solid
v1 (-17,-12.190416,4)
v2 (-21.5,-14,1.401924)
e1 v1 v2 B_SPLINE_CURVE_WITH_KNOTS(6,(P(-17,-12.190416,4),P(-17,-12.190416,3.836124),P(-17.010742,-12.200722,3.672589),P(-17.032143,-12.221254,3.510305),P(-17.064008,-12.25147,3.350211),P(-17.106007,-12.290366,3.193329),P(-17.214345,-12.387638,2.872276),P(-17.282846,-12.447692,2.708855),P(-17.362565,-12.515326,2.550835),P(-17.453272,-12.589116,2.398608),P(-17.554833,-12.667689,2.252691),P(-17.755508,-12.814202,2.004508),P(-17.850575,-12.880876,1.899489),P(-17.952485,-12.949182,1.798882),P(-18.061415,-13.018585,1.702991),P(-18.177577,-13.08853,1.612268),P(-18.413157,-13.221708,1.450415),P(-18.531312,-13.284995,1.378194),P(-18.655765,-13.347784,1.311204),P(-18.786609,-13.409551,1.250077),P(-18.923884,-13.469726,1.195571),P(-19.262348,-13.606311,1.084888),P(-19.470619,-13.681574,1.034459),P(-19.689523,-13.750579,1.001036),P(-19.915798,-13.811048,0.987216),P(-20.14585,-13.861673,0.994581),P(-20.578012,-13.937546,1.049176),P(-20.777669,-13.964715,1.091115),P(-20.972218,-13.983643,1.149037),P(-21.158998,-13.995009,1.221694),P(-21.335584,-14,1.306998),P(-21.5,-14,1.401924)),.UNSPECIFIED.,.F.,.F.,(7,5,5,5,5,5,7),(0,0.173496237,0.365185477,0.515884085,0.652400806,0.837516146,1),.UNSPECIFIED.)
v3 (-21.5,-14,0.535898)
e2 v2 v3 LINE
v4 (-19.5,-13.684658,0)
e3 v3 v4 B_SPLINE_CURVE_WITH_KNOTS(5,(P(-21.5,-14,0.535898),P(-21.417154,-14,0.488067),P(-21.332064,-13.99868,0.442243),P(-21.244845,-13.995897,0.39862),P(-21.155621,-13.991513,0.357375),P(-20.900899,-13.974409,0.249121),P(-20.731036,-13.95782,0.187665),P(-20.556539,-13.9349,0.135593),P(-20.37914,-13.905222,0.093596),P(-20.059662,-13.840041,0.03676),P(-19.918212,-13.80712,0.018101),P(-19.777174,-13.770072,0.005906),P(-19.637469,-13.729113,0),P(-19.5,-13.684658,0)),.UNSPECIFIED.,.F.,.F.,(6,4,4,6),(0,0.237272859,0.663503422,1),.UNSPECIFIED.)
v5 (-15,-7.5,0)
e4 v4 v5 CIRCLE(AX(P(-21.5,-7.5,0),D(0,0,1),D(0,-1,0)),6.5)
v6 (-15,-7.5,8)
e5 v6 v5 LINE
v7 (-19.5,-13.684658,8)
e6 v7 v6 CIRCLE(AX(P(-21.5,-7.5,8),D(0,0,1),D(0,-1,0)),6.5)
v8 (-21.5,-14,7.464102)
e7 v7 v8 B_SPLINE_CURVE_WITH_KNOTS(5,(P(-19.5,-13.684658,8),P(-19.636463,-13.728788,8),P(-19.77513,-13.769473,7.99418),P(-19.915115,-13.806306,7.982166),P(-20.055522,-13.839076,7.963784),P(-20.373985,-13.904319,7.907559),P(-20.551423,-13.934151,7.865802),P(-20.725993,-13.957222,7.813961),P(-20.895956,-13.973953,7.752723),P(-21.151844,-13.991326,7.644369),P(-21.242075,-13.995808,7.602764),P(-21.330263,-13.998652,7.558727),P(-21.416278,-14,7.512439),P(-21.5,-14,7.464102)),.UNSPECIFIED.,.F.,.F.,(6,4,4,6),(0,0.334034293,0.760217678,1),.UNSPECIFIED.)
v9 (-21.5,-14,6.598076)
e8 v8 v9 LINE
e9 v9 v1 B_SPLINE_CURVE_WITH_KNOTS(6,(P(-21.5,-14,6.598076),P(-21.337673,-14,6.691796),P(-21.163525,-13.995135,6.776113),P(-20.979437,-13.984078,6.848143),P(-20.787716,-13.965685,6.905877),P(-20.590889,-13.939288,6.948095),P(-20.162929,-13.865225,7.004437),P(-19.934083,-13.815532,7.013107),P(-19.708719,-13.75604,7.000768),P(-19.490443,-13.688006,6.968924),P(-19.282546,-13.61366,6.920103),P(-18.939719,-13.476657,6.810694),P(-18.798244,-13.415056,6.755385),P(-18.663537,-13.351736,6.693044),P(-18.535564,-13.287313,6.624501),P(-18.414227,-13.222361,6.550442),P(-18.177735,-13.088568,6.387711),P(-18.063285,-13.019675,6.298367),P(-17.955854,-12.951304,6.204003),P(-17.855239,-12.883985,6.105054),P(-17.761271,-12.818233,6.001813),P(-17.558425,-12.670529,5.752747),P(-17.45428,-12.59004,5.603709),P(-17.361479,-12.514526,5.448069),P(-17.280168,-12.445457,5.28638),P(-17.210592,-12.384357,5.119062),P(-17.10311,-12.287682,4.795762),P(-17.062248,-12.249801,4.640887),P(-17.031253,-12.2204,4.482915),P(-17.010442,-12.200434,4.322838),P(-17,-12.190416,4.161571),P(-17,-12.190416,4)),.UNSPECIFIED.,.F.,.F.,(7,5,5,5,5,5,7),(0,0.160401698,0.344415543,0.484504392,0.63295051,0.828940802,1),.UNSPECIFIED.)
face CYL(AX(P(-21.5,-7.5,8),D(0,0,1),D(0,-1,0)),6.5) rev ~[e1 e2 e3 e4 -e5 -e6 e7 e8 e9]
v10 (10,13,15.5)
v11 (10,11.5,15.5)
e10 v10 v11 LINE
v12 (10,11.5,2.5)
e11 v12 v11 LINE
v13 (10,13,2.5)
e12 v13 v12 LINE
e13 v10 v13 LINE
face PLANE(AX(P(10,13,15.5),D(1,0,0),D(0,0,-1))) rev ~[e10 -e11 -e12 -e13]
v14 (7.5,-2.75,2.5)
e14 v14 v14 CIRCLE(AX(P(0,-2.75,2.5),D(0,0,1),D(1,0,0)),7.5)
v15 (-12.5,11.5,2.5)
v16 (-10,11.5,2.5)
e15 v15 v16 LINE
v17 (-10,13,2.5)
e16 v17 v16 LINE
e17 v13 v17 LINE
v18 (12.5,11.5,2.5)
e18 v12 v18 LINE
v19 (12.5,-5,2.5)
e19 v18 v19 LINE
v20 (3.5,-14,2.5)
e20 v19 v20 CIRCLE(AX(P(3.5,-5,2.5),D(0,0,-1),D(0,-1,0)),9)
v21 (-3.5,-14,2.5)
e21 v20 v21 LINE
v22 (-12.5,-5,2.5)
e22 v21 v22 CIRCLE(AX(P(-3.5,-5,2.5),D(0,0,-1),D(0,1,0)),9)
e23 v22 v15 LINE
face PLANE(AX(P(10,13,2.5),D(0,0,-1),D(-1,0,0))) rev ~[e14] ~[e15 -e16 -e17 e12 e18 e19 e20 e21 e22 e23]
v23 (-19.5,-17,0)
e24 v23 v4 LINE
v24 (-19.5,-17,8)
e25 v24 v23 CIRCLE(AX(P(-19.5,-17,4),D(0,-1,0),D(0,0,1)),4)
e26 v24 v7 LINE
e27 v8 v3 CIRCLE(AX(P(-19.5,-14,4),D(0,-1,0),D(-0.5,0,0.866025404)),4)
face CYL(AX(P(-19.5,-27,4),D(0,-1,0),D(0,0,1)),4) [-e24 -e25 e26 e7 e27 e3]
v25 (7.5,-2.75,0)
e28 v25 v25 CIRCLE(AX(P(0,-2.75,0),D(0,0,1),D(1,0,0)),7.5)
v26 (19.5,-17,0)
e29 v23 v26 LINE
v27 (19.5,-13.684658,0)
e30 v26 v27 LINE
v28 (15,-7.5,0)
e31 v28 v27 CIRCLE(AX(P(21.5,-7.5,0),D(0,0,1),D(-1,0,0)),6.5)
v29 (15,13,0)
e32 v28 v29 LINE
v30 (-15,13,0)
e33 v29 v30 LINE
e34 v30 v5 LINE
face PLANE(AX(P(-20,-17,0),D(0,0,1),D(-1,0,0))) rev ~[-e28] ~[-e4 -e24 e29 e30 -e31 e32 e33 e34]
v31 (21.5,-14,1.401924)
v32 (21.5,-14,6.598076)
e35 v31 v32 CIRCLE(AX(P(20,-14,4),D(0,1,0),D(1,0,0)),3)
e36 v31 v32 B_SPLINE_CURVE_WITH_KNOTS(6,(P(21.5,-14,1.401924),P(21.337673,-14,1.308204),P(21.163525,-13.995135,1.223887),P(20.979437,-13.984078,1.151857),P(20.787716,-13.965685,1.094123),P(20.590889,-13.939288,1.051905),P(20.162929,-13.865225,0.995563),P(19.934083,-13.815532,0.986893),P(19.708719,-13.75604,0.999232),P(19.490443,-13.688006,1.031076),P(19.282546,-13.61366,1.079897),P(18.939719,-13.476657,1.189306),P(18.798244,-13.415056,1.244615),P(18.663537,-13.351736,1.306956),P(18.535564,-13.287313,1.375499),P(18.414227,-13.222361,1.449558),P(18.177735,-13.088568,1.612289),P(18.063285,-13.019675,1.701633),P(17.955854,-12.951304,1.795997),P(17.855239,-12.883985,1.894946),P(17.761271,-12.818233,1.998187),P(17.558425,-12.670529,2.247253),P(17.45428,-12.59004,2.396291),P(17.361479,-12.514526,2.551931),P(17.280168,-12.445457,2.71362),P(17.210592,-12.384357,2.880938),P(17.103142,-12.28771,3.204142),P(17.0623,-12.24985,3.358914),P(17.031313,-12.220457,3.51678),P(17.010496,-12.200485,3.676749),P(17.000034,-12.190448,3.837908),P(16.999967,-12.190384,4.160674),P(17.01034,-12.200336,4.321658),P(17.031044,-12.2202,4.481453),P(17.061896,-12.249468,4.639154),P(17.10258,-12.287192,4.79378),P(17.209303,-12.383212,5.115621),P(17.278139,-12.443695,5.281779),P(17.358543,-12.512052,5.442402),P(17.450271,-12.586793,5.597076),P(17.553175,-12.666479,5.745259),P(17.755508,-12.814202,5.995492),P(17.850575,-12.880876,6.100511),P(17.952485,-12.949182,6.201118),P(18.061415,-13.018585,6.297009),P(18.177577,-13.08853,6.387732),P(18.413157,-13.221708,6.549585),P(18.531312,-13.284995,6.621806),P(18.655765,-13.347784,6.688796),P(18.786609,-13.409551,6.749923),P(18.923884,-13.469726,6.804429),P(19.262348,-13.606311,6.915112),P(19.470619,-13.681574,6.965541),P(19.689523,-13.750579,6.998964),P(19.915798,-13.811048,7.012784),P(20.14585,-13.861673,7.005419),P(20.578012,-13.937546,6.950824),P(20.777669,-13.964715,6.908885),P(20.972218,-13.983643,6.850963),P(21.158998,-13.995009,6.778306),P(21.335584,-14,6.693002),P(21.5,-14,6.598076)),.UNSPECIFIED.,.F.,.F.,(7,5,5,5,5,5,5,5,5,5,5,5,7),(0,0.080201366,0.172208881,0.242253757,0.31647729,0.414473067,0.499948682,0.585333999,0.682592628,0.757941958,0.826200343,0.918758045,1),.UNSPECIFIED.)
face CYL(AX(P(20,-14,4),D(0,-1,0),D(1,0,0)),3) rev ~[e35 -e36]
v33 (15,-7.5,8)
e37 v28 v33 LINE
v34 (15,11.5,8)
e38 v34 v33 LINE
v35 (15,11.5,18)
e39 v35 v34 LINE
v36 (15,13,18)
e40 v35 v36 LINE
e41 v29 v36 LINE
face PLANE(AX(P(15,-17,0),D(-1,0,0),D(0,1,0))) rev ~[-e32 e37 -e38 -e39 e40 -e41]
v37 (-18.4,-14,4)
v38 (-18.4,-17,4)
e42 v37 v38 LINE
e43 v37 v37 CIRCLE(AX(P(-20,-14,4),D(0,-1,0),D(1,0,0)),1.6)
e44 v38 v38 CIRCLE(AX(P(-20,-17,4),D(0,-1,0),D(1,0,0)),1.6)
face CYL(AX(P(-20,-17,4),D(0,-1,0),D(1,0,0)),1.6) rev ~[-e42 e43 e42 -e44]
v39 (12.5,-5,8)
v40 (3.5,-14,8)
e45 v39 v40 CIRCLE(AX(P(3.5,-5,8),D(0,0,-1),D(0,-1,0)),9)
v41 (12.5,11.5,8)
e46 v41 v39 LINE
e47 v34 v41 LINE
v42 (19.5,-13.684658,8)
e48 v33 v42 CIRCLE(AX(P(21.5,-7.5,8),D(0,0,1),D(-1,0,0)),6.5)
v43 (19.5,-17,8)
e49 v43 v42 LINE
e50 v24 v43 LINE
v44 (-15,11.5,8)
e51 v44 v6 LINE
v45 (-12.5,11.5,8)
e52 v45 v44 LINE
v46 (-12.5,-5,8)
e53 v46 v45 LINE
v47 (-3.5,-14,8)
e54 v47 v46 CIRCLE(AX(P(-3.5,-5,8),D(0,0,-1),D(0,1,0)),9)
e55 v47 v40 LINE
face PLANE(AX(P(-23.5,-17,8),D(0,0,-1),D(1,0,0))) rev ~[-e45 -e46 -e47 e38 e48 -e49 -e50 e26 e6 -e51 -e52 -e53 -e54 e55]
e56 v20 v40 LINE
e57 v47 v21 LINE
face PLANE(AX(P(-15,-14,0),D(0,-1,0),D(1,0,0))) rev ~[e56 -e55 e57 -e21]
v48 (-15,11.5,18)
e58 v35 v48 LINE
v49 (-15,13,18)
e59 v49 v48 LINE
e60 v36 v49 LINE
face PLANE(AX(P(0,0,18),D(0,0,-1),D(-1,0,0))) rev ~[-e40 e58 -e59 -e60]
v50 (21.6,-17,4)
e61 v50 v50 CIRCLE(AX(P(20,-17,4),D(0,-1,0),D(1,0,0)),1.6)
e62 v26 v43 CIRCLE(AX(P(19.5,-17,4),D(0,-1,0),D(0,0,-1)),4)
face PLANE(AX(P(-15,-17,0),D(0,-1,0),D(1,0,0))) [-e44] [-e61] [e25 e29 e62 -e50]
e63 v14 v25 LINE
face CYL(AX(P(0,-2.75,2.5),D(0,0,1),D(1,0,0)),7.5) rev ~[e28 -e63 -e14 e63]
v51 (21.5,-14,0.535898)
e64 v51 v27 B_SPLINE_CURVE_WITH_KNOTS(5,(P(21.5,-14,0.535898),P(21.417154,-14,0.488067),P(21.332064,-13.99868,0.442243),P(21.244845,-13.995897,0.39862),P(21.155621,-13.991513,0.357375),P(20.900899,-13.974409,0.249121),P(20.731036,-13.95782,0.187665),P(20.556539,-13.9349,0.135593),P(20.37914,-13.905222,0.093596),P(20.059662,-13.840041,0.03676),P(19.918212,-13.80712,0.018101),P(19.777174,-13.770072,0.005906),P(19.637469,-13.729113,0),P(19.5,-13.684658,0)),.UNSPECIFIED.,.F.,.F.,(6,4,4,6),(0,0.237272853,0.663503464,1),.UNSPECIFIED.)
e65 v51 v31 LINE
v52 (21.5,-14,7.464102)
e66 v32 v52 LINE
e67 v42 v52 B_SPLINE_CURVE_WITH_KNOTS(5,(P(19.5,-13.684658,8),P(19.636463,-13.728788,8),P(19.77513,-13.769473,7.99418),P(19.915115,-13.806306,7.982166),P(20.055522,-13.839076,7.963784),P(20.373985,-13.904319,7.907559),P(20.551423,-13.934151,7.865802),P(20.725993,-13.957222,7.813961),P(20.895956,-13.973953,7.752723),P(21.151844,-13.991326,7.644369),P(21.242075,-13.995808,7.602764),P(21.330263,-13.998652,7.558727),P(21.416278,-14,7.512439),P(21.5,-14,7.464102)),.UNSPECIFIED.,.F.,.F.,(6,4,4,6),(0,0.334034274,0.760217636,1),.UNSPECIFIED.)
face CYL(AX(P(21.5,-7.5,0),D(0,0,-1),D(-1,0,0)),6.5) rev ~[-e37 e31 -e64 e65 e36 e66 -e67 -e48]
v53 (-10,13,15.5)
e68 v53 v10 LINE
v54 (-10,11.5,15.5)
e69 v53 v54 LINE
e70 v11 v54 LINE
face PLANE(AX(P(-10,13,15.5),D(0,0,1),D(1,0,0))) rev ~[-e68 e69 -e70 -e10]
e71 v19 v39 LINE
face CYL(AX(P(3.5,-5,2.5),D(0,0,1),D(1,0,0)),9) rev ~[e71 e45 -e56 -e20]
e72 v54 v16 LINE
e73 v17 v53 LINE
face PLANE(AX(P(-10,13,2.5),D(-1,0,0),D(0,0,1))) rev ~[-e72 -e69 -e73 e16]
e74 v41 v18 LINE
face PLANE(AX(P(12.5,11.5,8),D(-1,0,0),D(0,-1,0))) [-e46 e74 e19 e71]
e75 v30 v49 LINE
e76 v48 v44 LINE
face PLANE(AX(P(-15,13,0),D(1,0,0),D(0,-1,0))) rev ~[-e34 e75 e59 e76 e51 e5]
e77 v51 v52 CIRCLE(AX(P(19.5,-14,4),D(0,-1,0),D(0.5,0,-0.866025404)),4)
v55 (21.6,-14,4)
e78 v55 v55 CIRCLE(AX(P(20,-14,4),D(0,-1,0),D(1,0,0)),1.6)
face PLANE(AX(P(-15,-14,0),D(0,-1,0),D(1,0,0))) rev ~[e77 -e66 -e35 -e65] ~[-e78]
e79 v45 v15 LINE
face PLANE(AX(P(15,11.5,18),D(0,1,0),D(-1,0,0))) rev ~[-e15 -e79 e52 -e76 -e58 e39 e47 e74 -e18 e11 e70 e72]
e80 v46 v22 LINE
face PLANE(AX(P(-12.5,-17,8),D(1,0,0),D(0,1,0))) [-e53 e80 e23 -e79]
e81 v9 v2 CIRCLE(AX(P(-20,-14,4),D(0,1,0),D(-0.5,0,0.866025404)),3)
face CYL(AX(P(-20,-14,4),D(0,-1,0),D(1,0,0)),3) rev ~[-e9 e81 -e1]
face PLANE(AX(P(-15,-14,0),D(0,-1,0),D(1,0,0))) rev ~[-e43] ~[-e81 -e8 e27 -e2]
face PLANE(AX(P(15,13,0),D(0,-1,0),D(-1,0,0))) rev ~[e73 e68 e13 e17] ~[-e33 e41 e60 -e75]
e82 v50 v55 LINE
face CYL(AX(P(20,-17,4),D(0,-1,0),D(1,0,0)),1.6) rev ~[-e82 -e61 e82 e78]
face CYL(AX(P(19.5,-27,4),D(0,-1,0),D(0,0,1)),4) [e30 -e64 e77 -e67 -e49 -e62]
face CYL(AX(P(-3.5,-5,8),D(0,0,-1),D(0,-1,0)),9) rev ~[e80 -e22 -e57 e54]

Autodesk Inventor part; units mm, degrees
ref_plane "YZ Plane" through (0, 0, 0) normal (1, 0, 0) x (0, 1, 0)
ref_plane "XZ Plane" through (0, 0, 0) normal (0, 1, 0) x (-1, 0, 0)
ref_plane "XY Plane" through (0, 0, 0) normal (0, 0, 1) x (1, 0, 0)
sketch "スケッチ1" plane through (0, 0, 0) normal (0, 0, 1) x (1, 0, 0)
  line L0 (-59, 0) -> (-38, 0)
  line L1 (-38, 0) -> (-38, -21)
  line L2 (-38, -21) -> (-59, -21)
  line L3 (-59, -21) -> (-59, 0)
  line L4 (-61, 2) -> (-36, 2)
  line L5 (-36, 2) -> (-36, -23)
  line L6 (-36, -23) -> (-61, -23)
  line L7 (-61, -23) -> (-61, 2)
  line L8 (-61, -23) -> (0, -23)
  line L9 (0, -23) -> (0, -17)
  line L10 (0, -17) -> (-61, -17)
  line L11 (-61, -17) -> (-61, -23)
  line L12 (-48.5, -23) -> (-85.5, -23)
  line L13 (-85.5, -23) -> (-85.5, -17)
  line L14 (-85.5, -17) -> (-48.5, -17)
  line L15 (-48.5, -17) -> (-48.5, -23)
  line L16 (-85.5, 1) -> (-82.5, 1)
  line L17 (-82.5, 1) -> (-82.5, -23)
  line L18 (-82.5, -23) -> (-85.5, -23)
  line L19 (-85.5, -23) -> (-85.5, 1)
  line L20 (-85.5, -17) -> (-90.7, -17)
  line L21 (-90.7, -17) -> (-90.7, -23)
  line L22 (-90.7, -23) -> (-85.5, -23)
  line L23 (-85.5, -23) -> (-85.5, -17)
  line L24 (-90.7, -23) -> (-93.7, -23)
  line L25 (-93.7, -23) -> (-93.7, 1)
  line L26 (-93.7, 1) -> (-90.7, 1)
  line L27 (-90.7, 1) -> (-90.7, -23)
  point P0 (0, 0)
  point P1 (-61, -10.5)
  point P2 (-59, -10.5)
  point P3 (-48.5, 2)
  point P4 (-48.5, 0)
  point P5 (-36, -17)
  point P6 (-82.5, -17)
  dimension "d0" = 21
  dimension "d1" = 21
  dimension "d4" = 38
  dimension "d5" = 25
  dimension "d6" = 6
  dimension "d31" = 37
  dimension "d33" = 5.2
  dimension "d34" = 3
  dimension "d35" = 18
extrude "押し出し1" add sketch "スケッチ1" along normal blind 8 contours L10 L9 L8 L5
mirror "ミラー2" about plane through (0, -23, 0) normal (1, 0, 0)
sketch "スケッチ17" plane through (0, 0, 0) normal (0, 0, -1) x (-1, 0, 0)
  line L0 (-15, 13) -> (15, 13)
  line L1 (15, 13) -> (15, -17)
  line L2 (15, -17) -> (-15, -17)
  line L3 (-15, -17) -> (-15, 13)
  line L4 (-36, -17) -> (36, -17) projected
  point P0 (0, 13)
  point P1 (0, 13)
  point P2 (0, -17)
  dimension "d74" = 30
  dimension "d105" = 30
extrude "押し出し16" add sketch "スケッチ17" against normal blind 18
sketch "スケッチ18" plane through (-15, 13, 0) normal (0, 1, 0) x (1, 0, 0)
  line L0 (5, -15.5) -> (25, -15.5)
  line L1 (25, -15.5) -> (25, -2.5)
  line L2 (25, -2.5) -> (5, -2.5)
  line L3 (5, -2.5) -> (5, -15.5)
  line L4 (0, 0) -> (30, 0) projected
  line L5 (0, 0) -> (0, -18) projected
  point P0 (15, 0)
  point P1 (15, -2.5)
  point P2 (15, 0)
  point P3 (5, -9)
  point P4 (0, -9)
  dimension "d77" = 20
  dimension "d78" = 13
extrude "押し出し17" cut sketch "スケッチ18" against normal up to surface (30 mm away)
sketch "スケッチ19" plane through (0, 0, 18) normal (0, 0, 1) x (1, 0, 0)
  line L0 (-15, -17) -> (-15, -23) projected
  line L1 (15, 13) -> (15, -17) projected
  line L2 (-15, -17) -> (15, -17)
  line L3 (15, -17) -> (15, 11.5)
  line L4 (15, 11.5) -> (-15, 11.5)
  line L5 (-15, 11.5) -> (-15, -17)
  line L6 (15, 13) -> (-15, 13) projected
  point P0 (0, 0)
  point P1 (-15, 13)
  point P2 (15, -17)
  dimension "d81" = 1.5
extrude "押し出し18" cut sketch "スケッチ19" against normal up to surface (10 mm away)
sketch "スケッチ20" plane through (-15, 11.5, 8) normal (0, 0, 1) x (1, 0, 0)
  line L0 (0, 0) -> (30, 0) projected
  line L1 (30, -28.5) -> (51, -28.5) projected
  line L2 (2.5, 0) -> (47.5, 0)
  line L3 (40.5, -28.5) -> (2.5, -28.5)
  line L4 (2.5, -28.5) -> (2.5, 0)
  line L5 (5, 0) -> (5, -28.5) projected
  line L6 (25, 0) -> (27.5, 0)
  line L7 (27.5, 0) -> (27.5, -28.5)
  line L8 (27.5, -28.5) -> (25, -28.5)
  line L9 (25, -28.5) -> (25, 0)
  line L10 (25, -28.5) -> (25, 0) projected
  point P0 (15, -11.5)
  point P1 (40.5, -28.5)
  point P2 (25, -15)
  point P3 (5, -15)
  point P4 (51, -28.5)
  point P5 (5, -16)
  point P6 (25, -28.5)
  point P7 (27.5, 0)
  dimension "d85" = 2.5
  dimension "d113" = 2.5
extrude "押し出し19" cut sketch "スケッチ20" against normal up to surface (5.5 mm away) contours L0 L5 L3 L4 | L0 L7 L3 L9
sketch "スケッチ21" plane through (-10, 13, 2.5) normal (0, 0, 1) x (1, 0, 0)
  line L0 (20, 0) -> (20, -1.5) projected
  line L1 (0, 0) -> (20, 0) projected
  line L2 (0, 0) -> (0, -1.5) projected
  line L3 (-2.5, -30) -> (22.5, -30) projected
  circle A0 centre (10, -15.75) radius 7.5
  line L4 (-5, -1.5) -> (25, -1.5) projected
  line L5 (-2.5, -30) -> (-2.5, -1.5) projected
  line L6 (22.5, -30) -> (22.5, -1.5) projected
  line L7 (22.5, -1.5) -> (20, -1.5) projected
  line L8 (0, -1.5) -> (-2.5, -1.5) projected
  line L9 (-2.5, -1.5) -> (-2.5, -30) projected
  point P0 (0, -2)
  point P1 (10, -1.5)
  point P2 (25, -1.5)
  point P3 (-2.5, -15.75)
  dimension "d89" = 15
extrude "押し出し20" cut sketch "スケッチ21" against normal through all contours A0
sketch "スケッチ26" plane through (-36, -23, 0) normal (0, -1, 0) x (1, 0, 0)
  line L0 (0, 0) -> (72, 0) projected
  line L1 (72, 0) -> (72, 8) projected
  line L2 (0, 8) -> (72, 8) projected
  line L3 (0, 0) -> (0, 8) projected
  point P0 (36, 0)
extrude "押し出し25" cut sketch "スケッチ26" against normal up to surface (6 mm away)
sketch "スケッチ27" plane through (-15, -17, 0) normal (0, -1, 0) x (1, 0, 0)
  line L0 (-8.5, 8) -> (38.5, 8)
  line L1 (38.5, 8) -> (38.5, 0)
  line L2 (38.5, 0) -> (-8.5, 0)
  line L3 (-8.5, 0) -> (-8.5, 8)
  line L4 (-5, 8) -> (35, 8)
  line L5 (35, 8) -> (35, 0) construction
  line L6 (35, 0) -> (-5, 0)
  line L7 (-5, 0) -> (-5, 8) construction
  line L8 (0, 8) -> (30, 8) projected
  line L9 (30, 0) -> (0, 0) projected
  circle A0 centre (-5, 4) radius 1.6
  circle A1 centre (35, 4) radius 1.6
  point P0 (15, 0)
  point P1 (10.6, 8)
  point P2 (15, 0)
  point P3 (15, 0)
  dimension "d108" = 40
  dimension "d109" = 47
  dimension "d110" = 3.2
extrude "押し出し26" add sketch "スケッチ27" against normal blind 3
fillet "フィレット6" radius 6.5 2 edges at (-15, -14, 4) (15, -14, 4)
sketch "スケッチ28" plane through (-15, -14, 0) normal (0, 1, 0) x (1, 0, 0)
  circle A0 centre (-5, -4) radius 1.6 projected
  circle A1 centre (35, -4) radius 1.6 projected
  line L0 (-8.5, -8) -> (38.5, -8) projected
  line L1 (-8.5, -8) -> (-8.5, 0) projected
  line L2 (38.5, 0) -> (-8.5, 0) projected
  line L3 (38.5, 0) -> (38.5, -8) projected
  circle A2 centre (35, -4) radius 3
  circle A3 centre (-5, -4) radius 3
  point P0 (15, 0)
  dimension "d116" = 6
extrude "押し出し27" cut sketch "スケッチ28" along normal through all contours A0 | A1 | A2 | A3
fillet "フィレット7" radius 4 4 edges at (-23.5, -15.5, 8) (-23.5, -15.5, 0) (23.5, -15.5, 8) (23.5, -15.5, 0)
fillet "フィレット8" radius 9 2 edges at (12.5, -14, 5.25) (-12.5, -14, 5.25)
equation "\"d0\" = d1"
equation "\"d113\" = d85"
properties part number "スイッチセッター"
